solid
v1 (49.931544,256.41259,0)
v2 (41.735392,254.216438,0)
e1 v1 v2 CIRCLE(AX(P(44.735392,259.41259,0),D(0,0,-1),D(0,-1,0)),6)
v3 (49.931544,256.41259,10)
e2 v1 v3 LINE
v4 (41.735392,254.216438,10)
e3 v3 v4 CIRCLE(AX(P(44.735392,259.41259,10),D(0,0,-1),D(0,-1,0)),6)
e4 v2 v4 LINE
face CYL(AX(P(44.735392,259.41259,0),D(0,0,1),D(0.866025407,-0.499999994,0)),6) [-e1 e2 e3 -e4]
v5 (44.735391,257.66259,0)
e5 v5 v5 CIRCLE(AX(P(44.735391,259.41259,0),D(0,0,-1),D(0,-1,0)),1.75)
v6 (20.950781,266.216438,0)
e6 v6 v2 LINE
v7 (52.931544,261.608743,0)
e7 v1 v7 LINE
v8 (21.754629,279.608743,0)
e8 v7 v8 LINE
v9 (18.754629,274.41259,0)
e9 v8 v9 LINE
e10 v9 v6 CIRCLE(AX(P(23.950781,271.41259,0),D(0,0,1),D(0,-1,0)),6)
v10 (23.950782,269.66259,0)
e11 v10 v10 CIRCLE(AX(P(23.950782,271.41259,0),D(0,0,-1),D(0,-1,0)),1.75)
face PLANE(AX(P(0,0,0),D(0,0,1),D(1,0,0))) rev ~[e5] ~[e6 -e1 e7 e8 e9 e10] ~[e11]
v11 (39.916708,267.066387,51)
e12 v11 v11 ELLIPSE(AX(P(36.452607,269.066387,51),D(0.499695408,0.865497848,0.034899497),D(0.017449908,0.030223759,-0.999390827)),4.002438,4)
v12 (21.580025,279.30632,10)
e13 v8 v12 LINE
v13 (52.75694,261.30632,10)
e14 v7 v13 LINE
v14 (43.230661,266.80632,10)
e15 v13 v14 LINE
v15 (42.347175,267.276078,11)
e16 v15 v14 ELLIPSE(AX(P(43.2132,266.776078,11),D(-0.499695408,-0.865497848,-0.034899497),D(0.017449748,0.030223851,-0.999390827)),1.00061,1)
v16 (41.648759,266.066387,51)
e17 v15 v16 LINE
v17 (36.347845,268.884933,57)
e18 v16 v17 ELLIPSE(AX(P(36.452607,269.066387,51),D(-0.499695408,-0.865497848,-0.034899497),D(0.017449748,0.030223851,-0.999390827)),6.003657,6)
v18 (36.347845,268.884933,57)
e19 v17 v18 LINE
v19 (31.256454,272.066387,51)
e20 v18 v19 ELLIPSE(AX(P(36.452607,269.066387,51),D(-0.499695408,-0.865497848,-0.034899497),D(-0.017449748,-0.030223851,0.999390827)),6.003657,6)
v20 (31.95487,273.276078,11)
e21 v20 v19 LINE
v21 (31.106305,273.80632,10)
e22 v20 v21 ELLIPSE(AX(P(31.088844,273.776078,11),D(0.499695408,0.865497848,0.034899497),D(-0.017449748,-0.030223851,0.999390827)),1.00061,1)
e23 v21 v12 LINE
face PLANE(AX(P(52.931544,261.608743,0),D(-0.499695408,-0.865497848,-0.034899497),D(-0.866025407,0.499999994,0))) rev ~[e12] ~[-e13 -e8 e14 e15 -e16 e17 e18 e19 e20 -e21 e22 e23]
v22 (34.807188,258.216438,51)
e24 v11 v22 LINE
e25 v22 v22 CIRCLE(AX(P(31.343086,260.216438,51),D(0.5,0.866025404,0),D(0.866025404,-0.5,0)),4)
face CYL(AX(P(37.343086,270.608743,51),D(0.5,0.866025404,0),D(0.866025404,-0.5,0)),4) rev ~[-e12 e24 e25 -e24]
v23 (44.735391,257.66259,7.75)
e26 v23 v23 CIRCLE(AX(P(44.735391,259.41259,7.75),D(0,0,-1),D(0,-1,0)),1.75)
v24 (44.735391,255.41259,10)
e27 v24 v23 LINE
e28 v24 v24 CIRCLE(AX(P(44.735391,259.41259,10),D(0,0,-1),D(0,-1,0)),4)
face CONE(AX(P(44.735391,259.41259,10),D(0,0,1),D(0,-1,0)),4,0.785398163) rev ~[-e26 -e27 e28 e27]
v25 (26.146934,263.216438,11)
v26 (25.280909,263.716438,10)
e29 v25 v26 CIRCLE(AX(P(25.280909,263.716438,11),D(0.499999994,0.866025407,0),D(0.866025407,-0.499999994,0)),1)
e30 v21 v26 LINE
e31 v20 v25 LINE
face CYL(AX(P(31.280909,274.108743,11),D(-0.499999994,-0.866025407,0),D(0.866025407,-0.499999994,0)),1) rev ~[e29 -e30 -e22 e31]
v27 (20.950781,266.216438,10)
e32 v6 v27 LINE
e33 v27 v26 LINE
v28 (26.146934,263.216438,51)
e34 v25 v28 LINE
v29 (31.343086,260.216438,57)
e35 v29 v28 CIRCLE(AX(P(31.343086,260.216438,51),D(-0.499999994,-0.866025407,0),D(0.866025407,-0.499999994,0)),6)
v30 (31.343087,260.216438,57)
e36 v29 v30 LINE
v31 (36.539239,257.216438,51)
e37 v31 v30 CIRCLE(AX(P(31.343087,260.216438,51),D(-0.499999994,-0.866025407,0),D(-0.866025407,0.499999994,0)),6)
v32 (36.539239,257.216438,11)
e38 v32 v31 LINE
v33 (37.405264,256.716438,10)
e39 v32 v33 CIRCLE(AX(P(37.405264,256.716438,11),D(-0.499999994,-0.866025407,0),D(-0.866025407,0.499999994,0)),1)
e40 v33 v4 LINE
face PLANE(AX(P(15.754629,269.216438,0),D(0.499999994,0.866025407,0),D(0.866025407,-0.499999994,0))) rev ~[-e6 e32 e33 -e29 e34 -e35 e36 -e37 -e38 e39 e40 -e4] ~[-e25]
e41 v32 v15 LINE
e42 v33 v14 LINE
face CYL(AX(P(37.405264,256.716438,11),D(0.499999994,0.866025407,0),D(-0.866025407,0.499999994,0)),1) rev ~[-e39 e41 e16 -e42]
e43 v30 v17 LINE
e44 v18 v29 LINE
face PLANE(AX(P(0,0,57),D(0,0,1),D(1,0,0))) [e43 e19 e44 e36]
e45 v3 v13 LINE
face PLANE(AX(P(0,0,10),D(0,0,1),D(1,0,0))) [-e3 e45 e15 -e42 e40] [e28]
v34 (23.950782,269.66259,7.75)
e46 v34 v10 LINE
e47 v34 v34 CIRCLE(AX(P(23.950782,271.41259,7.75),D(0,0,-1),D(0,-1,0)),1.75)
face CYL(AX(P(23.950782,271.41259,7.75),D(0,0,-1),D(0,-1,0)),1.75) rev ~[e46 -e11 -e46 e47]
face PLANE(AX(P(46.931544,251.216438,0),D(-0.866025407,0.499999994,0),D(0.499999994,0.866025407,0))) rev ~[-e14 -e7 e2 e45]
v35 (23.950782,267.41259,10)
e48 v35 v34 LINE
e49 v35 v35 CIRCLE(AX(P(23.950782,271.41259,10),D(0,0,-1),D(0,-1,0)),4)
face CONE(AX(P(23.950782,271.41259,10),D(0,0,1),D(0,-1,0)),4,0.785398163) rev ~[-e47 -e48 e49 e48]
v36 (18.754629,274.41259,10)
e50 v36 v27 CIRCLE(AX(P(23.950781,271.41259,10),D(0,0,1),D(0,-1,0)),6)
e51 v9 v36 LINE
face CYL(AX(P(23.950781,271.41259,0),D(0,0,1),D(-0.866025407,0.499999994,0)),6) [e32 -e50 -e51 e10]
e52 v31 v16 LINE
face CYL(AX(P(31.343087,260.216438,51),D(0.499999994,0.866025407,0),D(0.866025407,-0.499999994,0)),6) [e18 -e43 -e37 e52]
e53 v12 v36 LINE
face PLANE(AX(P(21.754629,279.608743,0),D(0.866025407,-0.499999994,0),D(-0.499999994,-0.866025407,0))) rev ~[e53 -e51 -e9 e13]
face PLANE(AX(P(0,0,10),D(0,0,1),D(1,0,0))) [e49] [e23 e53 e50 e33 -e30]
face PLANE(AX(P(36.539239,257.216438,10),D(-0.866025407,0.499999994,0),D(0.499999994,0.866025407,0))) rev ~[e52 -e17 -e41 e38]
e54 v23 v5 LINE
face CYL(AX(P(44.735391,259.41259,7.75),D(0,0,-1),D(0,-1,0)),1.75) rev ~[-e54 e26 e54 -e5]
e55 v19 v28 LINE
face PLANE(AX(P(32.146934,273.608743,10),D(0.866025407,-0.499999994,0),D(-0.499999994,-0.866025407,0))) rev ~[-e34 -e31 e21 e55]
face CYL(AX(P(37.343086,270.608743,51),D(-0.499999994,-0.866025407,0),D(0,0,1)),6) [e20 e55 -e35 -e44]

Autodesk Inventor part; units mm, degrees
ref_plane "YZ Plane" through (0, 0, 0) normal (1, 0, 0) x (0, 1, 0)
ref_plane "XZ Plane" through (0, 0, 0) normal (0, 1, 0) x (-1, 0, 0)
ref_plane "XY Plane" through (0, 0, 0) normal (0, 0, 1) x (1, 0, 0)
ref_plane "Work Plane1" through (0, 0, 0) normal (0, 0, 1) x (1, 0, 0)
sketch "Sketch1" plane through (0, 0, 0) normal (0, 0, 1) x (1, 0, 0)
  line L0 (39.878985, 283.001047) -> (46.807188, 279.001047)
  line L1 (118.687297, 237.501047) -> (-32.001123, 324.501047)
  line L2 (118.687297, 237.501047) -> (112.687297, 227.108743)
  line L3 (-38.001123, 314.108743) -> (112.687297, 227.108743)
  line L4 (-32.001123, 324.501047) -> (-38.001123, 314.108743)
  line L5 (40.807188, 268.608743) -> (46.807188, 279.001047)
  line L6 (33.878985, 272.608743) -> (39.878985, 283.001047)
  line L7 (40.807188, 268.608743) -> (33.878985, 272.608743)
  circle A0 centre (68.259454, 214.654052) radius 27.5 construction
  line L8 (52.931544, 261.608743) -> (21.754629, 279.608743)
  line L9 (21.754629, 279.608743) -> (15.754629, 269.216438)
  line L10 (15.754629, 269.216438) -> (46.931544, 251.216438)
  line L11 (46.931544, 251.216438) -> (52.931544, 261.608743)
  point P0 (0, 0)
  dimension "d0" = 55
  dimension "d1" = 12
  dimension "d2" = 14
  dimension "d3" = 14
sketch "Sketch1 outline for Extrusion1" plane through (0, 0, 0) normal (0, 0, 1) x (1, 0, 0)
  line L0 (15.754629, 269.216438) -> (46.931544, 251.216438)
  line L1 (21.754629, 279.608743) -> (15.754629, 269.216438)
  line L2 (52.931544, 261.608743) -> (21.754629, 279.608743)
  line L3 (46.931544, 251.216438) -> (52.931544, 261.608743)
extrude "Extrusion1" add sketch "Sketch1 outline for Extrusion1" along normal blind 10
fillet "Fillet1" radius 6 2 edges at (15.7546, 269.2164, 5) (46.9315, 251.2164, 5)
sketch "Sketch2" plane through (0, 0, 10) normal (0, 0, 1) x (1, 0, 0)
  arc A0 (18.754629, 274.41259) -> (20.950782, 266.216438) centre (23.950782, 271.41259) ccw
  arc A1 (41.735391, 254.216438) -> (49.931544, 256.41259) centre (44.735391, 259.41259) ccw
  point P0 (0, 0)
hole "Hole1" at (23.950782, 271.41259, 10) at (44.735391, 259.41259, 10) direction (0, 0, -1) diameter 3.5 end through all countersink diameter 8 countersink angle 90
sketch "Sketch3" plane through (0, 0, 10) normal (0, 0, 1) x (1, 0, 0)
  line L0 (52.931544, 261.608743) -> (21.754629, 279.608743)
  line L1 (42.539239, 267.608743) -> (32.146934, 273.608743)
  line L2 (32.146934, 273.608743) -> (26.146934, 263.216438)
  line L3 (26.146934, 263.216438) -> (36.539239, 257.216438)
  line L4 (36.539239, 257.216438) -> (42.539239, 267.608743)
  line L5 (21.754629, 279.608743) -> (18.754629, 274.41259)
  line L6 (49.931544, 256.41259) -> (52.931544, 261.608743)
  point P0 (0, 0)
  dimension "d14" = 12
  dimension "d15" = 12
  dimension "d16" = 12
sketch "Sketch3 outline for Extrusion2" plane through (0, 0, 10) normal (0, 0, 1) x (1, 0, 0)
  line L0 (26.146934, 263.216438) -> (36.539239, 257.216438)
  line L1 (32.146934, 273.608743) -> (26.146934, 263.216438)
  line L2 (42.539239, 267.608743) -> (32.146934, 273.608743)
  line L3 (36.539239, 257.216438) -> (42.539239, 267.608743)
extrude "Extrusion2" add sketch "Sketch3 outline for Extrusion2" along normal blind 47
sketch "Sketch4" plane through (21.754629, 279.608743, 10) normal (0.5, 0.8660254, 0) x (0.8660254, -0.5, 0)
  circle A0 centre (18, -41) radius 4 projected
  point P0 (120.96431, 10)
sketch "Sketch4 outline for Extrusion3" plane through (21.754629, 279.608743, 10) normal (0.5, 0.8660254, 0) x (0.8660254, -0.5, 0)
  circle A0 centre (18, -41) radius 4
extrude "Extrusion3" cut sketch "Sketch4 outline for Extrusion3" against normal through all
fillet "Fillet2" radius 6 2 edges at (39.5392, 262.4126, 57) (29.1469, 268.4126, 57)
fillet "Fillet3" radius 1 2 edges at (29.1469, 268.4126, 10) (39.5392, 262.4126, 10)
draft "FaceDraft1" angle 2 pull direction (0, 0, 1) faces at (37.48227, 270.528385, 23.009722) fixed edges at (37.343087, 270.608743, 0)
equation "\"d2\" = d3"
equation "\"d15\" = d16"
properties part number "backcover_clamp"
